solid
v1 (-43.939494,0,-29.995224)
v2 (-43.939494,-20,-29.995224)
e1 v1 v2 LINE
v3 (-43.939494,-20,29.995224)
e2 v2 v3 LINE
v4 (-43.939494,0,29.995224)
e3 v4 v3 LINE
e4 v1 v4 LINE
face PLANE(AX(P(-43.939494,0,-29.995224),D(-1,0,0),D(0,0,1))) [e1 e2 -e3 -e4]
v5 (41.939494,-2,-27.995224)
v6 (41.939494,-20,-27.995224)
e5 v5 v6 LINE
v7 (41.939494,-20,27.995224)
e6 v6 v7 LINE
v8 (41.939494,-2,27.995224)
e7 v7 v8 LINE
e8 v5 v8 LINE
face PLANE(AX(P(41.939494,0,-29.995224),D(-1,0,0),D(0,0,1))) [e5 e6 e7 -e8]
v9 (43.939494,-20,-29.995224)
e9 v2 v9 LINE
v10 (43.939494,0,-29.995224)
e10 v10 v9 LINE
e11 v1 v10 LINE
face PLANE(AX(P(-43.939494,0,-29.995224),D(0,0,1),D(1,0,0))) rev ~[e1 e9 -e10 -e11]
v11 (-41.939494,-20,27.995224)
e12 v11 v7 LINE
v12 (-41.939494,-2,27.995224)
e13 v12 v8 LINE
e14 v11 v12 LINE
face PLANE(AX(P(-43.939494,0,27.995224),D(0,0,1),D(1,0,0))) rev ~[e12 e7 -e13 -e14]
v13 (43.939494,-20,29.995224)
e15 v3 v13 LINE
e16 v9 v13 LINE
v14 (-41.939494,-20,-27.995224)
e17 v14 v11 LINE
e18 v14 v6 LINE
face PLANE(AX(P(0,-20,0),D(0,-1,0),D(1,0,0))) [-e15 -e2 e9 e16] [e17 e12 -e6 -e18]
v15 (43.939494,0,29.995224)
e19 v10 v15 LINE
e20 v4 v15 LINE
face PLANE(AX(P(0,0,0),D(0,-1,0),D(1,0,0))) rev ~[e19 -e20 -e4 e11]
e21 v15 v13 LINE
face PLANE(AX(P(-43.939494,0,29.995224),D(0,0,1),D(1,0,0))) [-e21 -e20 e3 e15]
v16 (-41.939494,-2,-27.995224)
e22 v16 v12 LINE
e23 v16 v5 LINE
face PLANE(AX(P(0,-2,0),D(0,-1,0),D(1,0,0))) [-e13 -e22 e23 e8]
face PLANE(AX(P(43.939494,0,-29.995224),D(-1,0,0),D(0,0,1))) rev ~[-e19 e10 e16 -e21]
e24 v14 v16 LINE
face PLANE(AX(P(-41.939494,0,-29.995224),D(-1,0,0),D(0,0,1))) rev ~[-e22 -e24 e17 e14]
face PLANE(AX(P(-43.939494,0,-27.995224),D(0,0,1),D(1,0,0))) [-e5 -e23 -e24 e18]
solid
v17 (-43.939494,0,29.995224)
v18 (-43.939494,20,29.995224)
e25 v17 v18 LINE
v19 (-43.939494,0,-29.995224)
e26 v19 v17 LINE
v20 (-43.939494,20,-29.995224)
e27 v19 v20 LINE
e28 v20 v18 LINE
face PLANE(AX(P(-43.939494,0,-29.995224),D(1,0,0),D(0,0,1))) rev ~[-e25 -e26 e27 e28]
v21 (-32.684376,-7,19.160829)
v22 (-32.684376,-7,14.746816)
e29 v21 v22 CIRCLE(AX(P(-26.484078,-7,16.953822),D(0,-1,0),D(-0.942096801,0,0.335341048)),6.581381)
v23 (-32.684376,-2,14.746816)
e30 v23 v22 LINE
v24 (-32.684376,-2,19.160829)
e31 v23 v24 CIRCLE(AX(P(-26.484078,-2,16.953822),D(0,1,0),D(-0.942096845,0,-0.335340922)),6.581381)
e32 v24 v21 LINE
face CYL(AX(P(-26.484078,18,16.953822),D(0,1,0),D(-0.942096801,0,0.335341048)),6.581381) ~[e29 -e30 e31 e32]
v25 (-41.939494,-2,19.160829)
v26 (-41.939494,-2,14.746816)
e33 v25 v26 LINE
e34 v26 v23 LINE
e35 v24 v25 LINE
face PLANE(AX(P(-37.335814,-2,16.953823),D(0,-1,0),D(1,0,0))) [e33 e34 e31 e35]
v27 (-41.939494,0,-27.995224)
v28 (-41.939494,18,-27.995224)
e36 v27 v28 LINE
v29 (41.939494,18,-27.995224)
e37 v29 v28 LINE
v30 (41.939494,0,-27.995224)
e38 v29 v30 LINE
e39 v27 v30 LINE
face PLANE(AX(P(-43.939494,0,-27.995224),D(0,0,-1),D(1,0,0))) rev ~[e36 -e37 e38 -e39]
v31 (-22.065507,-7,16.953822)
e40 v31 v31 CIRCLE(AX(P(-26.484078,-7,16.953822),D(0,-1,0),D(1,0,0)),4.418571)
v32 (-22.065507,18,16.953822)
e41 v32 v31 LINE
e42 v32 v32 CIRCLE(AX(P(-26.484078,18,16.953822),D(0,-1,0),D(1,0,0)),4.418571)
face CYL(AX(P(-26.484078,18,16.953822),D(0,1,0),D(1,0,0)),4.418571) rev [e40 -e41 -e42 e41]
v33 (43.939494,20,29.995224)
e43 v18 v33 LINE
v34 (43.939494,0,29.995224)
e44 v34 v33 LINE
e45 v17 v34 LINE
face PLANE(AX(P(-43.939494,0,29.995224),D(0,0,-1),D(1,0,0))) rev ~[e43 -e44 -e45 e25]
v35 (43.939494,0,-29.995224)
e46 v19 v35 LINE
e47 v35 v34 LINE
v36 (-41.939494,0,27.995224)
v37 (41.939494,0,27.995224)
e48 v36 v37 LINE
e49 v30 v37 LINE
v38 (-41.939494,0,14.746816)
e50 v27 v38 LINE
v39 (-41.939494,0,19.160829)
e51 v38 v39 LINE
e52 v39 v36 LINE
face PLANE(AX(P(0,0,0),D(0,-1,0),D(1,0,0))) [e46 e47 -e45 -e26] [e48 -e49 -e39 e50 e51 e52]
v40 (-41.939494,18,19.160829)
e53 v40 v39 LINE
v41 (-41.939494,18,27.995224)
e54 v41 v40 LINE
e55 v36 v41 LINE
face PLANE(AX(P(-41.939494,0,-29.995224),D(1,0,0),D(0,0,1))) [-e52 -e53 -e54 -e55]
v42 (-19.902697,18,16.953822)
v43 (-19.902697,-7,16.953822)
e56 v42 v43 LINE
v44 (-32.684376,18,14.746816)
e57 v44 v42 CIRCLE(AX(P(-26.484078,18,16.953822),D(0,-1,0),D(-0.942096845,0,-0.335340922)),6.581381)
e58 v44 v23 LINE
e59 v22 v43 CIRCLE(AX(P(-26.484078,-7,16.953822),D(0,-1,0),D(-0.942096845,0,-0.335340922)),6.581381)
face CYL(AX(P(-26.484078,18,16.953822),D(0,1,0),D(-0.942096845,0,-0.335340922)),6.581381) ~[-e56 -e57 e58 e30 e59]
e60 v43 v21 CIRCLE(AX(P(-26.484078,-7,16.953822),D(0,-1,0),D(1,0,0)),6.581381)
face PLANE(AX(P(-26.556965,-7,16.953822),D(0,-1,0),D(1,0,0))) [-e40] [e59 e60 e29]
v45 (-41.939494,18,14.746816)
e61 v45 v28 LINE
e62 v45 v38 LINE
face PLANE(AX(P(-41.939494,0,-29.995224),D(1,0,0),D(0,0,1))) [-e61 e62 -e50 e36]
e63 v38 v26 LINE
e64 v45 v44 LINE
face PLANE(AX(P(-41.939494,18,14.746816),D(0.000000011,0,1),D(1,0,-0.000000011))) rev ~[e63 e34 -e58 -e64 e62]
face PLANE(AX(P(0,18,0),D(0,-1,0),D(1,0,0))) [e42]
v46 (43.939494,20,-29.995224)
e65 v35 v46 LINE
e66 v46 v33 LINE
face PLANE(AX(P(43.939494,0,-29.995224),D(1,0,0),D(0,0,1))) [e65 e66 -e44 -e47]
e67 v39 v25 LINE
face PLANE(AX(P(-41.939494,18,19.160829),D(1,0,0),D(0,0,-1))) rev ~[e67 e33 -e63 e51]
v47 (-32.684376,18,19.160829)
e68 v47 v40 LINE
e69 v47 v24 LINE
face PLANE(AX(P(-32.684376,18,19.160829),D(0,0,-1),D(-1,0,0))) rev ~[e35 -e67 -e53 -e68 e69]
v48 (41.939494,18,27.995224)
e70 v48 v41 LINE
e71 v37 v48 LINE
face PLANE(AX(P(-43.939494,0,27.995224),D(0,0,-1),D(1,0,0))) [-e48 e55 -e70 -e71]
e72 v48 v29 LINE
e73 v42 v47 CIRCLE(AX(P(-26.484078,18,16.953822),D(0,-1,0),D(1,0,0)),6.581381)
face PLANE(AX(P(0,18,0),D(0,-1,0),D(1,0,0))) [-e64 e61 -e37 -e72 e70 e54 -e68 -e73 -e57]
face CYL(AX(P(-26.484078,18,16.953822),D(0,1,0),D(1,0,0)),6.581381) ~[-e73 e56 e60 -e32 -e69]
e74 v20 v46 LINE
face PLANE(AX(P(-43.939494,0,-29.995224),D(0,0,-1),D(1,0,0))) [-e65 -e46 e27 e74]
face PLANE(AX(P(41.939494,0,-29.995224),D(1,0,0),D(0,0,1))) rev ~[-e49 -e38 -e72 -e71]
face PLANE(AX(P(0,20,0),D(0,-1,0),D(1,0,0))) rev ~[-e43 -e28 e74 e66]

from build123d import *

# Parameters (mm, degrees)
F0_W     = 87.8789871931
F0_H     = 59.9904470146
F1_DEPTH = 20
F2_T     = -2
F3_R     = 4.4185706022
F4_DEPTH = 25
F5_DEPTH = 20
F6_W     = 87.8789871931
F6_H     = 59.9904470146
F7_DEPTH = 20
F8_T     = -2


# Not quite as in the source:
# - ends of sketch curves that miss each other by under 0.0002 mm in the source are joined


with BuildPart() as f1:
    # F0 (on Front) → F1 (new body)
    with BuildSketch(Plane.XZ):
        Rectangle(F0_W, F0_H)
    extrude(amount=-F1_DEPTH)

    # F2
    f2_openings = [f1.faces().sort_by_distance(p)[0] for p in [
        (0, 0, 0),
    ]]
    offset(amount=F2_T, openings=f2_openings)

    # F3 (on face) → F4 (join)
    with BuildSketch(Plane.XZ.offset(-18)):
        with BuildLine():
            ThreePointArc((-32.6843762426, 14.7468157928), (-25.3642450586, 10.4684114553), (-19.9026966179, 16.9538222253))
            ThreePointArc((-19.9026966179, 16.9538222253), (-25.3642446263, 23.4392329207), (-32.6843759484, 19.1608294845))
            ThreePointArc((-32.6843759484, 19.1608294845), (-33.0654589748, 16.953822664), (-32.6843762426, 14.7468157928))
        make_face()
        with Locations((-26.4840777963, 16.9538222253)):
            Circle(F3_R, mode=Mode.SUBTRACT)
    extrude(amount=F4_DEPTH)

    # F3 (on face) → F5 (join)
    with BuildSketch(Plane.XZ.offset(-18)):
        with BuildLine():
            ThreePointArc((-32.6843762426, 14.7468157928), (-33.0654589748, 16.953822664), (-32.6843759484, 19.1608294845))
            Line((-32.6843759484, 19.1608294845), (-41.9394935966, 19.1608294845))
            Line((-41.9394935966, 19.1608294845), (-41.9394935966, 14.7468158975))
            Line((-41.9394935966, 14.7468158975), (-32.6843762426, 14.7468157928))
        make_face()
    extrude(amount=F5_DEPTH)


with BuildPart() as f7:
    # F6 (on Front) → F7 (new body)
    with BuildSketch(Plane.XZ):
        Rectangle(F6_W, F6_H)
    extrude(amount=F7_DEPTH)

    # F8
    f8_openings = [f7.faces().sort_by_distance(p)[0] for p in [
        (0, -20, 0),
    ]]
    offset(amount=F8_T, openings=f8_openings)


solid = Compound([f1.part, f7.part])
